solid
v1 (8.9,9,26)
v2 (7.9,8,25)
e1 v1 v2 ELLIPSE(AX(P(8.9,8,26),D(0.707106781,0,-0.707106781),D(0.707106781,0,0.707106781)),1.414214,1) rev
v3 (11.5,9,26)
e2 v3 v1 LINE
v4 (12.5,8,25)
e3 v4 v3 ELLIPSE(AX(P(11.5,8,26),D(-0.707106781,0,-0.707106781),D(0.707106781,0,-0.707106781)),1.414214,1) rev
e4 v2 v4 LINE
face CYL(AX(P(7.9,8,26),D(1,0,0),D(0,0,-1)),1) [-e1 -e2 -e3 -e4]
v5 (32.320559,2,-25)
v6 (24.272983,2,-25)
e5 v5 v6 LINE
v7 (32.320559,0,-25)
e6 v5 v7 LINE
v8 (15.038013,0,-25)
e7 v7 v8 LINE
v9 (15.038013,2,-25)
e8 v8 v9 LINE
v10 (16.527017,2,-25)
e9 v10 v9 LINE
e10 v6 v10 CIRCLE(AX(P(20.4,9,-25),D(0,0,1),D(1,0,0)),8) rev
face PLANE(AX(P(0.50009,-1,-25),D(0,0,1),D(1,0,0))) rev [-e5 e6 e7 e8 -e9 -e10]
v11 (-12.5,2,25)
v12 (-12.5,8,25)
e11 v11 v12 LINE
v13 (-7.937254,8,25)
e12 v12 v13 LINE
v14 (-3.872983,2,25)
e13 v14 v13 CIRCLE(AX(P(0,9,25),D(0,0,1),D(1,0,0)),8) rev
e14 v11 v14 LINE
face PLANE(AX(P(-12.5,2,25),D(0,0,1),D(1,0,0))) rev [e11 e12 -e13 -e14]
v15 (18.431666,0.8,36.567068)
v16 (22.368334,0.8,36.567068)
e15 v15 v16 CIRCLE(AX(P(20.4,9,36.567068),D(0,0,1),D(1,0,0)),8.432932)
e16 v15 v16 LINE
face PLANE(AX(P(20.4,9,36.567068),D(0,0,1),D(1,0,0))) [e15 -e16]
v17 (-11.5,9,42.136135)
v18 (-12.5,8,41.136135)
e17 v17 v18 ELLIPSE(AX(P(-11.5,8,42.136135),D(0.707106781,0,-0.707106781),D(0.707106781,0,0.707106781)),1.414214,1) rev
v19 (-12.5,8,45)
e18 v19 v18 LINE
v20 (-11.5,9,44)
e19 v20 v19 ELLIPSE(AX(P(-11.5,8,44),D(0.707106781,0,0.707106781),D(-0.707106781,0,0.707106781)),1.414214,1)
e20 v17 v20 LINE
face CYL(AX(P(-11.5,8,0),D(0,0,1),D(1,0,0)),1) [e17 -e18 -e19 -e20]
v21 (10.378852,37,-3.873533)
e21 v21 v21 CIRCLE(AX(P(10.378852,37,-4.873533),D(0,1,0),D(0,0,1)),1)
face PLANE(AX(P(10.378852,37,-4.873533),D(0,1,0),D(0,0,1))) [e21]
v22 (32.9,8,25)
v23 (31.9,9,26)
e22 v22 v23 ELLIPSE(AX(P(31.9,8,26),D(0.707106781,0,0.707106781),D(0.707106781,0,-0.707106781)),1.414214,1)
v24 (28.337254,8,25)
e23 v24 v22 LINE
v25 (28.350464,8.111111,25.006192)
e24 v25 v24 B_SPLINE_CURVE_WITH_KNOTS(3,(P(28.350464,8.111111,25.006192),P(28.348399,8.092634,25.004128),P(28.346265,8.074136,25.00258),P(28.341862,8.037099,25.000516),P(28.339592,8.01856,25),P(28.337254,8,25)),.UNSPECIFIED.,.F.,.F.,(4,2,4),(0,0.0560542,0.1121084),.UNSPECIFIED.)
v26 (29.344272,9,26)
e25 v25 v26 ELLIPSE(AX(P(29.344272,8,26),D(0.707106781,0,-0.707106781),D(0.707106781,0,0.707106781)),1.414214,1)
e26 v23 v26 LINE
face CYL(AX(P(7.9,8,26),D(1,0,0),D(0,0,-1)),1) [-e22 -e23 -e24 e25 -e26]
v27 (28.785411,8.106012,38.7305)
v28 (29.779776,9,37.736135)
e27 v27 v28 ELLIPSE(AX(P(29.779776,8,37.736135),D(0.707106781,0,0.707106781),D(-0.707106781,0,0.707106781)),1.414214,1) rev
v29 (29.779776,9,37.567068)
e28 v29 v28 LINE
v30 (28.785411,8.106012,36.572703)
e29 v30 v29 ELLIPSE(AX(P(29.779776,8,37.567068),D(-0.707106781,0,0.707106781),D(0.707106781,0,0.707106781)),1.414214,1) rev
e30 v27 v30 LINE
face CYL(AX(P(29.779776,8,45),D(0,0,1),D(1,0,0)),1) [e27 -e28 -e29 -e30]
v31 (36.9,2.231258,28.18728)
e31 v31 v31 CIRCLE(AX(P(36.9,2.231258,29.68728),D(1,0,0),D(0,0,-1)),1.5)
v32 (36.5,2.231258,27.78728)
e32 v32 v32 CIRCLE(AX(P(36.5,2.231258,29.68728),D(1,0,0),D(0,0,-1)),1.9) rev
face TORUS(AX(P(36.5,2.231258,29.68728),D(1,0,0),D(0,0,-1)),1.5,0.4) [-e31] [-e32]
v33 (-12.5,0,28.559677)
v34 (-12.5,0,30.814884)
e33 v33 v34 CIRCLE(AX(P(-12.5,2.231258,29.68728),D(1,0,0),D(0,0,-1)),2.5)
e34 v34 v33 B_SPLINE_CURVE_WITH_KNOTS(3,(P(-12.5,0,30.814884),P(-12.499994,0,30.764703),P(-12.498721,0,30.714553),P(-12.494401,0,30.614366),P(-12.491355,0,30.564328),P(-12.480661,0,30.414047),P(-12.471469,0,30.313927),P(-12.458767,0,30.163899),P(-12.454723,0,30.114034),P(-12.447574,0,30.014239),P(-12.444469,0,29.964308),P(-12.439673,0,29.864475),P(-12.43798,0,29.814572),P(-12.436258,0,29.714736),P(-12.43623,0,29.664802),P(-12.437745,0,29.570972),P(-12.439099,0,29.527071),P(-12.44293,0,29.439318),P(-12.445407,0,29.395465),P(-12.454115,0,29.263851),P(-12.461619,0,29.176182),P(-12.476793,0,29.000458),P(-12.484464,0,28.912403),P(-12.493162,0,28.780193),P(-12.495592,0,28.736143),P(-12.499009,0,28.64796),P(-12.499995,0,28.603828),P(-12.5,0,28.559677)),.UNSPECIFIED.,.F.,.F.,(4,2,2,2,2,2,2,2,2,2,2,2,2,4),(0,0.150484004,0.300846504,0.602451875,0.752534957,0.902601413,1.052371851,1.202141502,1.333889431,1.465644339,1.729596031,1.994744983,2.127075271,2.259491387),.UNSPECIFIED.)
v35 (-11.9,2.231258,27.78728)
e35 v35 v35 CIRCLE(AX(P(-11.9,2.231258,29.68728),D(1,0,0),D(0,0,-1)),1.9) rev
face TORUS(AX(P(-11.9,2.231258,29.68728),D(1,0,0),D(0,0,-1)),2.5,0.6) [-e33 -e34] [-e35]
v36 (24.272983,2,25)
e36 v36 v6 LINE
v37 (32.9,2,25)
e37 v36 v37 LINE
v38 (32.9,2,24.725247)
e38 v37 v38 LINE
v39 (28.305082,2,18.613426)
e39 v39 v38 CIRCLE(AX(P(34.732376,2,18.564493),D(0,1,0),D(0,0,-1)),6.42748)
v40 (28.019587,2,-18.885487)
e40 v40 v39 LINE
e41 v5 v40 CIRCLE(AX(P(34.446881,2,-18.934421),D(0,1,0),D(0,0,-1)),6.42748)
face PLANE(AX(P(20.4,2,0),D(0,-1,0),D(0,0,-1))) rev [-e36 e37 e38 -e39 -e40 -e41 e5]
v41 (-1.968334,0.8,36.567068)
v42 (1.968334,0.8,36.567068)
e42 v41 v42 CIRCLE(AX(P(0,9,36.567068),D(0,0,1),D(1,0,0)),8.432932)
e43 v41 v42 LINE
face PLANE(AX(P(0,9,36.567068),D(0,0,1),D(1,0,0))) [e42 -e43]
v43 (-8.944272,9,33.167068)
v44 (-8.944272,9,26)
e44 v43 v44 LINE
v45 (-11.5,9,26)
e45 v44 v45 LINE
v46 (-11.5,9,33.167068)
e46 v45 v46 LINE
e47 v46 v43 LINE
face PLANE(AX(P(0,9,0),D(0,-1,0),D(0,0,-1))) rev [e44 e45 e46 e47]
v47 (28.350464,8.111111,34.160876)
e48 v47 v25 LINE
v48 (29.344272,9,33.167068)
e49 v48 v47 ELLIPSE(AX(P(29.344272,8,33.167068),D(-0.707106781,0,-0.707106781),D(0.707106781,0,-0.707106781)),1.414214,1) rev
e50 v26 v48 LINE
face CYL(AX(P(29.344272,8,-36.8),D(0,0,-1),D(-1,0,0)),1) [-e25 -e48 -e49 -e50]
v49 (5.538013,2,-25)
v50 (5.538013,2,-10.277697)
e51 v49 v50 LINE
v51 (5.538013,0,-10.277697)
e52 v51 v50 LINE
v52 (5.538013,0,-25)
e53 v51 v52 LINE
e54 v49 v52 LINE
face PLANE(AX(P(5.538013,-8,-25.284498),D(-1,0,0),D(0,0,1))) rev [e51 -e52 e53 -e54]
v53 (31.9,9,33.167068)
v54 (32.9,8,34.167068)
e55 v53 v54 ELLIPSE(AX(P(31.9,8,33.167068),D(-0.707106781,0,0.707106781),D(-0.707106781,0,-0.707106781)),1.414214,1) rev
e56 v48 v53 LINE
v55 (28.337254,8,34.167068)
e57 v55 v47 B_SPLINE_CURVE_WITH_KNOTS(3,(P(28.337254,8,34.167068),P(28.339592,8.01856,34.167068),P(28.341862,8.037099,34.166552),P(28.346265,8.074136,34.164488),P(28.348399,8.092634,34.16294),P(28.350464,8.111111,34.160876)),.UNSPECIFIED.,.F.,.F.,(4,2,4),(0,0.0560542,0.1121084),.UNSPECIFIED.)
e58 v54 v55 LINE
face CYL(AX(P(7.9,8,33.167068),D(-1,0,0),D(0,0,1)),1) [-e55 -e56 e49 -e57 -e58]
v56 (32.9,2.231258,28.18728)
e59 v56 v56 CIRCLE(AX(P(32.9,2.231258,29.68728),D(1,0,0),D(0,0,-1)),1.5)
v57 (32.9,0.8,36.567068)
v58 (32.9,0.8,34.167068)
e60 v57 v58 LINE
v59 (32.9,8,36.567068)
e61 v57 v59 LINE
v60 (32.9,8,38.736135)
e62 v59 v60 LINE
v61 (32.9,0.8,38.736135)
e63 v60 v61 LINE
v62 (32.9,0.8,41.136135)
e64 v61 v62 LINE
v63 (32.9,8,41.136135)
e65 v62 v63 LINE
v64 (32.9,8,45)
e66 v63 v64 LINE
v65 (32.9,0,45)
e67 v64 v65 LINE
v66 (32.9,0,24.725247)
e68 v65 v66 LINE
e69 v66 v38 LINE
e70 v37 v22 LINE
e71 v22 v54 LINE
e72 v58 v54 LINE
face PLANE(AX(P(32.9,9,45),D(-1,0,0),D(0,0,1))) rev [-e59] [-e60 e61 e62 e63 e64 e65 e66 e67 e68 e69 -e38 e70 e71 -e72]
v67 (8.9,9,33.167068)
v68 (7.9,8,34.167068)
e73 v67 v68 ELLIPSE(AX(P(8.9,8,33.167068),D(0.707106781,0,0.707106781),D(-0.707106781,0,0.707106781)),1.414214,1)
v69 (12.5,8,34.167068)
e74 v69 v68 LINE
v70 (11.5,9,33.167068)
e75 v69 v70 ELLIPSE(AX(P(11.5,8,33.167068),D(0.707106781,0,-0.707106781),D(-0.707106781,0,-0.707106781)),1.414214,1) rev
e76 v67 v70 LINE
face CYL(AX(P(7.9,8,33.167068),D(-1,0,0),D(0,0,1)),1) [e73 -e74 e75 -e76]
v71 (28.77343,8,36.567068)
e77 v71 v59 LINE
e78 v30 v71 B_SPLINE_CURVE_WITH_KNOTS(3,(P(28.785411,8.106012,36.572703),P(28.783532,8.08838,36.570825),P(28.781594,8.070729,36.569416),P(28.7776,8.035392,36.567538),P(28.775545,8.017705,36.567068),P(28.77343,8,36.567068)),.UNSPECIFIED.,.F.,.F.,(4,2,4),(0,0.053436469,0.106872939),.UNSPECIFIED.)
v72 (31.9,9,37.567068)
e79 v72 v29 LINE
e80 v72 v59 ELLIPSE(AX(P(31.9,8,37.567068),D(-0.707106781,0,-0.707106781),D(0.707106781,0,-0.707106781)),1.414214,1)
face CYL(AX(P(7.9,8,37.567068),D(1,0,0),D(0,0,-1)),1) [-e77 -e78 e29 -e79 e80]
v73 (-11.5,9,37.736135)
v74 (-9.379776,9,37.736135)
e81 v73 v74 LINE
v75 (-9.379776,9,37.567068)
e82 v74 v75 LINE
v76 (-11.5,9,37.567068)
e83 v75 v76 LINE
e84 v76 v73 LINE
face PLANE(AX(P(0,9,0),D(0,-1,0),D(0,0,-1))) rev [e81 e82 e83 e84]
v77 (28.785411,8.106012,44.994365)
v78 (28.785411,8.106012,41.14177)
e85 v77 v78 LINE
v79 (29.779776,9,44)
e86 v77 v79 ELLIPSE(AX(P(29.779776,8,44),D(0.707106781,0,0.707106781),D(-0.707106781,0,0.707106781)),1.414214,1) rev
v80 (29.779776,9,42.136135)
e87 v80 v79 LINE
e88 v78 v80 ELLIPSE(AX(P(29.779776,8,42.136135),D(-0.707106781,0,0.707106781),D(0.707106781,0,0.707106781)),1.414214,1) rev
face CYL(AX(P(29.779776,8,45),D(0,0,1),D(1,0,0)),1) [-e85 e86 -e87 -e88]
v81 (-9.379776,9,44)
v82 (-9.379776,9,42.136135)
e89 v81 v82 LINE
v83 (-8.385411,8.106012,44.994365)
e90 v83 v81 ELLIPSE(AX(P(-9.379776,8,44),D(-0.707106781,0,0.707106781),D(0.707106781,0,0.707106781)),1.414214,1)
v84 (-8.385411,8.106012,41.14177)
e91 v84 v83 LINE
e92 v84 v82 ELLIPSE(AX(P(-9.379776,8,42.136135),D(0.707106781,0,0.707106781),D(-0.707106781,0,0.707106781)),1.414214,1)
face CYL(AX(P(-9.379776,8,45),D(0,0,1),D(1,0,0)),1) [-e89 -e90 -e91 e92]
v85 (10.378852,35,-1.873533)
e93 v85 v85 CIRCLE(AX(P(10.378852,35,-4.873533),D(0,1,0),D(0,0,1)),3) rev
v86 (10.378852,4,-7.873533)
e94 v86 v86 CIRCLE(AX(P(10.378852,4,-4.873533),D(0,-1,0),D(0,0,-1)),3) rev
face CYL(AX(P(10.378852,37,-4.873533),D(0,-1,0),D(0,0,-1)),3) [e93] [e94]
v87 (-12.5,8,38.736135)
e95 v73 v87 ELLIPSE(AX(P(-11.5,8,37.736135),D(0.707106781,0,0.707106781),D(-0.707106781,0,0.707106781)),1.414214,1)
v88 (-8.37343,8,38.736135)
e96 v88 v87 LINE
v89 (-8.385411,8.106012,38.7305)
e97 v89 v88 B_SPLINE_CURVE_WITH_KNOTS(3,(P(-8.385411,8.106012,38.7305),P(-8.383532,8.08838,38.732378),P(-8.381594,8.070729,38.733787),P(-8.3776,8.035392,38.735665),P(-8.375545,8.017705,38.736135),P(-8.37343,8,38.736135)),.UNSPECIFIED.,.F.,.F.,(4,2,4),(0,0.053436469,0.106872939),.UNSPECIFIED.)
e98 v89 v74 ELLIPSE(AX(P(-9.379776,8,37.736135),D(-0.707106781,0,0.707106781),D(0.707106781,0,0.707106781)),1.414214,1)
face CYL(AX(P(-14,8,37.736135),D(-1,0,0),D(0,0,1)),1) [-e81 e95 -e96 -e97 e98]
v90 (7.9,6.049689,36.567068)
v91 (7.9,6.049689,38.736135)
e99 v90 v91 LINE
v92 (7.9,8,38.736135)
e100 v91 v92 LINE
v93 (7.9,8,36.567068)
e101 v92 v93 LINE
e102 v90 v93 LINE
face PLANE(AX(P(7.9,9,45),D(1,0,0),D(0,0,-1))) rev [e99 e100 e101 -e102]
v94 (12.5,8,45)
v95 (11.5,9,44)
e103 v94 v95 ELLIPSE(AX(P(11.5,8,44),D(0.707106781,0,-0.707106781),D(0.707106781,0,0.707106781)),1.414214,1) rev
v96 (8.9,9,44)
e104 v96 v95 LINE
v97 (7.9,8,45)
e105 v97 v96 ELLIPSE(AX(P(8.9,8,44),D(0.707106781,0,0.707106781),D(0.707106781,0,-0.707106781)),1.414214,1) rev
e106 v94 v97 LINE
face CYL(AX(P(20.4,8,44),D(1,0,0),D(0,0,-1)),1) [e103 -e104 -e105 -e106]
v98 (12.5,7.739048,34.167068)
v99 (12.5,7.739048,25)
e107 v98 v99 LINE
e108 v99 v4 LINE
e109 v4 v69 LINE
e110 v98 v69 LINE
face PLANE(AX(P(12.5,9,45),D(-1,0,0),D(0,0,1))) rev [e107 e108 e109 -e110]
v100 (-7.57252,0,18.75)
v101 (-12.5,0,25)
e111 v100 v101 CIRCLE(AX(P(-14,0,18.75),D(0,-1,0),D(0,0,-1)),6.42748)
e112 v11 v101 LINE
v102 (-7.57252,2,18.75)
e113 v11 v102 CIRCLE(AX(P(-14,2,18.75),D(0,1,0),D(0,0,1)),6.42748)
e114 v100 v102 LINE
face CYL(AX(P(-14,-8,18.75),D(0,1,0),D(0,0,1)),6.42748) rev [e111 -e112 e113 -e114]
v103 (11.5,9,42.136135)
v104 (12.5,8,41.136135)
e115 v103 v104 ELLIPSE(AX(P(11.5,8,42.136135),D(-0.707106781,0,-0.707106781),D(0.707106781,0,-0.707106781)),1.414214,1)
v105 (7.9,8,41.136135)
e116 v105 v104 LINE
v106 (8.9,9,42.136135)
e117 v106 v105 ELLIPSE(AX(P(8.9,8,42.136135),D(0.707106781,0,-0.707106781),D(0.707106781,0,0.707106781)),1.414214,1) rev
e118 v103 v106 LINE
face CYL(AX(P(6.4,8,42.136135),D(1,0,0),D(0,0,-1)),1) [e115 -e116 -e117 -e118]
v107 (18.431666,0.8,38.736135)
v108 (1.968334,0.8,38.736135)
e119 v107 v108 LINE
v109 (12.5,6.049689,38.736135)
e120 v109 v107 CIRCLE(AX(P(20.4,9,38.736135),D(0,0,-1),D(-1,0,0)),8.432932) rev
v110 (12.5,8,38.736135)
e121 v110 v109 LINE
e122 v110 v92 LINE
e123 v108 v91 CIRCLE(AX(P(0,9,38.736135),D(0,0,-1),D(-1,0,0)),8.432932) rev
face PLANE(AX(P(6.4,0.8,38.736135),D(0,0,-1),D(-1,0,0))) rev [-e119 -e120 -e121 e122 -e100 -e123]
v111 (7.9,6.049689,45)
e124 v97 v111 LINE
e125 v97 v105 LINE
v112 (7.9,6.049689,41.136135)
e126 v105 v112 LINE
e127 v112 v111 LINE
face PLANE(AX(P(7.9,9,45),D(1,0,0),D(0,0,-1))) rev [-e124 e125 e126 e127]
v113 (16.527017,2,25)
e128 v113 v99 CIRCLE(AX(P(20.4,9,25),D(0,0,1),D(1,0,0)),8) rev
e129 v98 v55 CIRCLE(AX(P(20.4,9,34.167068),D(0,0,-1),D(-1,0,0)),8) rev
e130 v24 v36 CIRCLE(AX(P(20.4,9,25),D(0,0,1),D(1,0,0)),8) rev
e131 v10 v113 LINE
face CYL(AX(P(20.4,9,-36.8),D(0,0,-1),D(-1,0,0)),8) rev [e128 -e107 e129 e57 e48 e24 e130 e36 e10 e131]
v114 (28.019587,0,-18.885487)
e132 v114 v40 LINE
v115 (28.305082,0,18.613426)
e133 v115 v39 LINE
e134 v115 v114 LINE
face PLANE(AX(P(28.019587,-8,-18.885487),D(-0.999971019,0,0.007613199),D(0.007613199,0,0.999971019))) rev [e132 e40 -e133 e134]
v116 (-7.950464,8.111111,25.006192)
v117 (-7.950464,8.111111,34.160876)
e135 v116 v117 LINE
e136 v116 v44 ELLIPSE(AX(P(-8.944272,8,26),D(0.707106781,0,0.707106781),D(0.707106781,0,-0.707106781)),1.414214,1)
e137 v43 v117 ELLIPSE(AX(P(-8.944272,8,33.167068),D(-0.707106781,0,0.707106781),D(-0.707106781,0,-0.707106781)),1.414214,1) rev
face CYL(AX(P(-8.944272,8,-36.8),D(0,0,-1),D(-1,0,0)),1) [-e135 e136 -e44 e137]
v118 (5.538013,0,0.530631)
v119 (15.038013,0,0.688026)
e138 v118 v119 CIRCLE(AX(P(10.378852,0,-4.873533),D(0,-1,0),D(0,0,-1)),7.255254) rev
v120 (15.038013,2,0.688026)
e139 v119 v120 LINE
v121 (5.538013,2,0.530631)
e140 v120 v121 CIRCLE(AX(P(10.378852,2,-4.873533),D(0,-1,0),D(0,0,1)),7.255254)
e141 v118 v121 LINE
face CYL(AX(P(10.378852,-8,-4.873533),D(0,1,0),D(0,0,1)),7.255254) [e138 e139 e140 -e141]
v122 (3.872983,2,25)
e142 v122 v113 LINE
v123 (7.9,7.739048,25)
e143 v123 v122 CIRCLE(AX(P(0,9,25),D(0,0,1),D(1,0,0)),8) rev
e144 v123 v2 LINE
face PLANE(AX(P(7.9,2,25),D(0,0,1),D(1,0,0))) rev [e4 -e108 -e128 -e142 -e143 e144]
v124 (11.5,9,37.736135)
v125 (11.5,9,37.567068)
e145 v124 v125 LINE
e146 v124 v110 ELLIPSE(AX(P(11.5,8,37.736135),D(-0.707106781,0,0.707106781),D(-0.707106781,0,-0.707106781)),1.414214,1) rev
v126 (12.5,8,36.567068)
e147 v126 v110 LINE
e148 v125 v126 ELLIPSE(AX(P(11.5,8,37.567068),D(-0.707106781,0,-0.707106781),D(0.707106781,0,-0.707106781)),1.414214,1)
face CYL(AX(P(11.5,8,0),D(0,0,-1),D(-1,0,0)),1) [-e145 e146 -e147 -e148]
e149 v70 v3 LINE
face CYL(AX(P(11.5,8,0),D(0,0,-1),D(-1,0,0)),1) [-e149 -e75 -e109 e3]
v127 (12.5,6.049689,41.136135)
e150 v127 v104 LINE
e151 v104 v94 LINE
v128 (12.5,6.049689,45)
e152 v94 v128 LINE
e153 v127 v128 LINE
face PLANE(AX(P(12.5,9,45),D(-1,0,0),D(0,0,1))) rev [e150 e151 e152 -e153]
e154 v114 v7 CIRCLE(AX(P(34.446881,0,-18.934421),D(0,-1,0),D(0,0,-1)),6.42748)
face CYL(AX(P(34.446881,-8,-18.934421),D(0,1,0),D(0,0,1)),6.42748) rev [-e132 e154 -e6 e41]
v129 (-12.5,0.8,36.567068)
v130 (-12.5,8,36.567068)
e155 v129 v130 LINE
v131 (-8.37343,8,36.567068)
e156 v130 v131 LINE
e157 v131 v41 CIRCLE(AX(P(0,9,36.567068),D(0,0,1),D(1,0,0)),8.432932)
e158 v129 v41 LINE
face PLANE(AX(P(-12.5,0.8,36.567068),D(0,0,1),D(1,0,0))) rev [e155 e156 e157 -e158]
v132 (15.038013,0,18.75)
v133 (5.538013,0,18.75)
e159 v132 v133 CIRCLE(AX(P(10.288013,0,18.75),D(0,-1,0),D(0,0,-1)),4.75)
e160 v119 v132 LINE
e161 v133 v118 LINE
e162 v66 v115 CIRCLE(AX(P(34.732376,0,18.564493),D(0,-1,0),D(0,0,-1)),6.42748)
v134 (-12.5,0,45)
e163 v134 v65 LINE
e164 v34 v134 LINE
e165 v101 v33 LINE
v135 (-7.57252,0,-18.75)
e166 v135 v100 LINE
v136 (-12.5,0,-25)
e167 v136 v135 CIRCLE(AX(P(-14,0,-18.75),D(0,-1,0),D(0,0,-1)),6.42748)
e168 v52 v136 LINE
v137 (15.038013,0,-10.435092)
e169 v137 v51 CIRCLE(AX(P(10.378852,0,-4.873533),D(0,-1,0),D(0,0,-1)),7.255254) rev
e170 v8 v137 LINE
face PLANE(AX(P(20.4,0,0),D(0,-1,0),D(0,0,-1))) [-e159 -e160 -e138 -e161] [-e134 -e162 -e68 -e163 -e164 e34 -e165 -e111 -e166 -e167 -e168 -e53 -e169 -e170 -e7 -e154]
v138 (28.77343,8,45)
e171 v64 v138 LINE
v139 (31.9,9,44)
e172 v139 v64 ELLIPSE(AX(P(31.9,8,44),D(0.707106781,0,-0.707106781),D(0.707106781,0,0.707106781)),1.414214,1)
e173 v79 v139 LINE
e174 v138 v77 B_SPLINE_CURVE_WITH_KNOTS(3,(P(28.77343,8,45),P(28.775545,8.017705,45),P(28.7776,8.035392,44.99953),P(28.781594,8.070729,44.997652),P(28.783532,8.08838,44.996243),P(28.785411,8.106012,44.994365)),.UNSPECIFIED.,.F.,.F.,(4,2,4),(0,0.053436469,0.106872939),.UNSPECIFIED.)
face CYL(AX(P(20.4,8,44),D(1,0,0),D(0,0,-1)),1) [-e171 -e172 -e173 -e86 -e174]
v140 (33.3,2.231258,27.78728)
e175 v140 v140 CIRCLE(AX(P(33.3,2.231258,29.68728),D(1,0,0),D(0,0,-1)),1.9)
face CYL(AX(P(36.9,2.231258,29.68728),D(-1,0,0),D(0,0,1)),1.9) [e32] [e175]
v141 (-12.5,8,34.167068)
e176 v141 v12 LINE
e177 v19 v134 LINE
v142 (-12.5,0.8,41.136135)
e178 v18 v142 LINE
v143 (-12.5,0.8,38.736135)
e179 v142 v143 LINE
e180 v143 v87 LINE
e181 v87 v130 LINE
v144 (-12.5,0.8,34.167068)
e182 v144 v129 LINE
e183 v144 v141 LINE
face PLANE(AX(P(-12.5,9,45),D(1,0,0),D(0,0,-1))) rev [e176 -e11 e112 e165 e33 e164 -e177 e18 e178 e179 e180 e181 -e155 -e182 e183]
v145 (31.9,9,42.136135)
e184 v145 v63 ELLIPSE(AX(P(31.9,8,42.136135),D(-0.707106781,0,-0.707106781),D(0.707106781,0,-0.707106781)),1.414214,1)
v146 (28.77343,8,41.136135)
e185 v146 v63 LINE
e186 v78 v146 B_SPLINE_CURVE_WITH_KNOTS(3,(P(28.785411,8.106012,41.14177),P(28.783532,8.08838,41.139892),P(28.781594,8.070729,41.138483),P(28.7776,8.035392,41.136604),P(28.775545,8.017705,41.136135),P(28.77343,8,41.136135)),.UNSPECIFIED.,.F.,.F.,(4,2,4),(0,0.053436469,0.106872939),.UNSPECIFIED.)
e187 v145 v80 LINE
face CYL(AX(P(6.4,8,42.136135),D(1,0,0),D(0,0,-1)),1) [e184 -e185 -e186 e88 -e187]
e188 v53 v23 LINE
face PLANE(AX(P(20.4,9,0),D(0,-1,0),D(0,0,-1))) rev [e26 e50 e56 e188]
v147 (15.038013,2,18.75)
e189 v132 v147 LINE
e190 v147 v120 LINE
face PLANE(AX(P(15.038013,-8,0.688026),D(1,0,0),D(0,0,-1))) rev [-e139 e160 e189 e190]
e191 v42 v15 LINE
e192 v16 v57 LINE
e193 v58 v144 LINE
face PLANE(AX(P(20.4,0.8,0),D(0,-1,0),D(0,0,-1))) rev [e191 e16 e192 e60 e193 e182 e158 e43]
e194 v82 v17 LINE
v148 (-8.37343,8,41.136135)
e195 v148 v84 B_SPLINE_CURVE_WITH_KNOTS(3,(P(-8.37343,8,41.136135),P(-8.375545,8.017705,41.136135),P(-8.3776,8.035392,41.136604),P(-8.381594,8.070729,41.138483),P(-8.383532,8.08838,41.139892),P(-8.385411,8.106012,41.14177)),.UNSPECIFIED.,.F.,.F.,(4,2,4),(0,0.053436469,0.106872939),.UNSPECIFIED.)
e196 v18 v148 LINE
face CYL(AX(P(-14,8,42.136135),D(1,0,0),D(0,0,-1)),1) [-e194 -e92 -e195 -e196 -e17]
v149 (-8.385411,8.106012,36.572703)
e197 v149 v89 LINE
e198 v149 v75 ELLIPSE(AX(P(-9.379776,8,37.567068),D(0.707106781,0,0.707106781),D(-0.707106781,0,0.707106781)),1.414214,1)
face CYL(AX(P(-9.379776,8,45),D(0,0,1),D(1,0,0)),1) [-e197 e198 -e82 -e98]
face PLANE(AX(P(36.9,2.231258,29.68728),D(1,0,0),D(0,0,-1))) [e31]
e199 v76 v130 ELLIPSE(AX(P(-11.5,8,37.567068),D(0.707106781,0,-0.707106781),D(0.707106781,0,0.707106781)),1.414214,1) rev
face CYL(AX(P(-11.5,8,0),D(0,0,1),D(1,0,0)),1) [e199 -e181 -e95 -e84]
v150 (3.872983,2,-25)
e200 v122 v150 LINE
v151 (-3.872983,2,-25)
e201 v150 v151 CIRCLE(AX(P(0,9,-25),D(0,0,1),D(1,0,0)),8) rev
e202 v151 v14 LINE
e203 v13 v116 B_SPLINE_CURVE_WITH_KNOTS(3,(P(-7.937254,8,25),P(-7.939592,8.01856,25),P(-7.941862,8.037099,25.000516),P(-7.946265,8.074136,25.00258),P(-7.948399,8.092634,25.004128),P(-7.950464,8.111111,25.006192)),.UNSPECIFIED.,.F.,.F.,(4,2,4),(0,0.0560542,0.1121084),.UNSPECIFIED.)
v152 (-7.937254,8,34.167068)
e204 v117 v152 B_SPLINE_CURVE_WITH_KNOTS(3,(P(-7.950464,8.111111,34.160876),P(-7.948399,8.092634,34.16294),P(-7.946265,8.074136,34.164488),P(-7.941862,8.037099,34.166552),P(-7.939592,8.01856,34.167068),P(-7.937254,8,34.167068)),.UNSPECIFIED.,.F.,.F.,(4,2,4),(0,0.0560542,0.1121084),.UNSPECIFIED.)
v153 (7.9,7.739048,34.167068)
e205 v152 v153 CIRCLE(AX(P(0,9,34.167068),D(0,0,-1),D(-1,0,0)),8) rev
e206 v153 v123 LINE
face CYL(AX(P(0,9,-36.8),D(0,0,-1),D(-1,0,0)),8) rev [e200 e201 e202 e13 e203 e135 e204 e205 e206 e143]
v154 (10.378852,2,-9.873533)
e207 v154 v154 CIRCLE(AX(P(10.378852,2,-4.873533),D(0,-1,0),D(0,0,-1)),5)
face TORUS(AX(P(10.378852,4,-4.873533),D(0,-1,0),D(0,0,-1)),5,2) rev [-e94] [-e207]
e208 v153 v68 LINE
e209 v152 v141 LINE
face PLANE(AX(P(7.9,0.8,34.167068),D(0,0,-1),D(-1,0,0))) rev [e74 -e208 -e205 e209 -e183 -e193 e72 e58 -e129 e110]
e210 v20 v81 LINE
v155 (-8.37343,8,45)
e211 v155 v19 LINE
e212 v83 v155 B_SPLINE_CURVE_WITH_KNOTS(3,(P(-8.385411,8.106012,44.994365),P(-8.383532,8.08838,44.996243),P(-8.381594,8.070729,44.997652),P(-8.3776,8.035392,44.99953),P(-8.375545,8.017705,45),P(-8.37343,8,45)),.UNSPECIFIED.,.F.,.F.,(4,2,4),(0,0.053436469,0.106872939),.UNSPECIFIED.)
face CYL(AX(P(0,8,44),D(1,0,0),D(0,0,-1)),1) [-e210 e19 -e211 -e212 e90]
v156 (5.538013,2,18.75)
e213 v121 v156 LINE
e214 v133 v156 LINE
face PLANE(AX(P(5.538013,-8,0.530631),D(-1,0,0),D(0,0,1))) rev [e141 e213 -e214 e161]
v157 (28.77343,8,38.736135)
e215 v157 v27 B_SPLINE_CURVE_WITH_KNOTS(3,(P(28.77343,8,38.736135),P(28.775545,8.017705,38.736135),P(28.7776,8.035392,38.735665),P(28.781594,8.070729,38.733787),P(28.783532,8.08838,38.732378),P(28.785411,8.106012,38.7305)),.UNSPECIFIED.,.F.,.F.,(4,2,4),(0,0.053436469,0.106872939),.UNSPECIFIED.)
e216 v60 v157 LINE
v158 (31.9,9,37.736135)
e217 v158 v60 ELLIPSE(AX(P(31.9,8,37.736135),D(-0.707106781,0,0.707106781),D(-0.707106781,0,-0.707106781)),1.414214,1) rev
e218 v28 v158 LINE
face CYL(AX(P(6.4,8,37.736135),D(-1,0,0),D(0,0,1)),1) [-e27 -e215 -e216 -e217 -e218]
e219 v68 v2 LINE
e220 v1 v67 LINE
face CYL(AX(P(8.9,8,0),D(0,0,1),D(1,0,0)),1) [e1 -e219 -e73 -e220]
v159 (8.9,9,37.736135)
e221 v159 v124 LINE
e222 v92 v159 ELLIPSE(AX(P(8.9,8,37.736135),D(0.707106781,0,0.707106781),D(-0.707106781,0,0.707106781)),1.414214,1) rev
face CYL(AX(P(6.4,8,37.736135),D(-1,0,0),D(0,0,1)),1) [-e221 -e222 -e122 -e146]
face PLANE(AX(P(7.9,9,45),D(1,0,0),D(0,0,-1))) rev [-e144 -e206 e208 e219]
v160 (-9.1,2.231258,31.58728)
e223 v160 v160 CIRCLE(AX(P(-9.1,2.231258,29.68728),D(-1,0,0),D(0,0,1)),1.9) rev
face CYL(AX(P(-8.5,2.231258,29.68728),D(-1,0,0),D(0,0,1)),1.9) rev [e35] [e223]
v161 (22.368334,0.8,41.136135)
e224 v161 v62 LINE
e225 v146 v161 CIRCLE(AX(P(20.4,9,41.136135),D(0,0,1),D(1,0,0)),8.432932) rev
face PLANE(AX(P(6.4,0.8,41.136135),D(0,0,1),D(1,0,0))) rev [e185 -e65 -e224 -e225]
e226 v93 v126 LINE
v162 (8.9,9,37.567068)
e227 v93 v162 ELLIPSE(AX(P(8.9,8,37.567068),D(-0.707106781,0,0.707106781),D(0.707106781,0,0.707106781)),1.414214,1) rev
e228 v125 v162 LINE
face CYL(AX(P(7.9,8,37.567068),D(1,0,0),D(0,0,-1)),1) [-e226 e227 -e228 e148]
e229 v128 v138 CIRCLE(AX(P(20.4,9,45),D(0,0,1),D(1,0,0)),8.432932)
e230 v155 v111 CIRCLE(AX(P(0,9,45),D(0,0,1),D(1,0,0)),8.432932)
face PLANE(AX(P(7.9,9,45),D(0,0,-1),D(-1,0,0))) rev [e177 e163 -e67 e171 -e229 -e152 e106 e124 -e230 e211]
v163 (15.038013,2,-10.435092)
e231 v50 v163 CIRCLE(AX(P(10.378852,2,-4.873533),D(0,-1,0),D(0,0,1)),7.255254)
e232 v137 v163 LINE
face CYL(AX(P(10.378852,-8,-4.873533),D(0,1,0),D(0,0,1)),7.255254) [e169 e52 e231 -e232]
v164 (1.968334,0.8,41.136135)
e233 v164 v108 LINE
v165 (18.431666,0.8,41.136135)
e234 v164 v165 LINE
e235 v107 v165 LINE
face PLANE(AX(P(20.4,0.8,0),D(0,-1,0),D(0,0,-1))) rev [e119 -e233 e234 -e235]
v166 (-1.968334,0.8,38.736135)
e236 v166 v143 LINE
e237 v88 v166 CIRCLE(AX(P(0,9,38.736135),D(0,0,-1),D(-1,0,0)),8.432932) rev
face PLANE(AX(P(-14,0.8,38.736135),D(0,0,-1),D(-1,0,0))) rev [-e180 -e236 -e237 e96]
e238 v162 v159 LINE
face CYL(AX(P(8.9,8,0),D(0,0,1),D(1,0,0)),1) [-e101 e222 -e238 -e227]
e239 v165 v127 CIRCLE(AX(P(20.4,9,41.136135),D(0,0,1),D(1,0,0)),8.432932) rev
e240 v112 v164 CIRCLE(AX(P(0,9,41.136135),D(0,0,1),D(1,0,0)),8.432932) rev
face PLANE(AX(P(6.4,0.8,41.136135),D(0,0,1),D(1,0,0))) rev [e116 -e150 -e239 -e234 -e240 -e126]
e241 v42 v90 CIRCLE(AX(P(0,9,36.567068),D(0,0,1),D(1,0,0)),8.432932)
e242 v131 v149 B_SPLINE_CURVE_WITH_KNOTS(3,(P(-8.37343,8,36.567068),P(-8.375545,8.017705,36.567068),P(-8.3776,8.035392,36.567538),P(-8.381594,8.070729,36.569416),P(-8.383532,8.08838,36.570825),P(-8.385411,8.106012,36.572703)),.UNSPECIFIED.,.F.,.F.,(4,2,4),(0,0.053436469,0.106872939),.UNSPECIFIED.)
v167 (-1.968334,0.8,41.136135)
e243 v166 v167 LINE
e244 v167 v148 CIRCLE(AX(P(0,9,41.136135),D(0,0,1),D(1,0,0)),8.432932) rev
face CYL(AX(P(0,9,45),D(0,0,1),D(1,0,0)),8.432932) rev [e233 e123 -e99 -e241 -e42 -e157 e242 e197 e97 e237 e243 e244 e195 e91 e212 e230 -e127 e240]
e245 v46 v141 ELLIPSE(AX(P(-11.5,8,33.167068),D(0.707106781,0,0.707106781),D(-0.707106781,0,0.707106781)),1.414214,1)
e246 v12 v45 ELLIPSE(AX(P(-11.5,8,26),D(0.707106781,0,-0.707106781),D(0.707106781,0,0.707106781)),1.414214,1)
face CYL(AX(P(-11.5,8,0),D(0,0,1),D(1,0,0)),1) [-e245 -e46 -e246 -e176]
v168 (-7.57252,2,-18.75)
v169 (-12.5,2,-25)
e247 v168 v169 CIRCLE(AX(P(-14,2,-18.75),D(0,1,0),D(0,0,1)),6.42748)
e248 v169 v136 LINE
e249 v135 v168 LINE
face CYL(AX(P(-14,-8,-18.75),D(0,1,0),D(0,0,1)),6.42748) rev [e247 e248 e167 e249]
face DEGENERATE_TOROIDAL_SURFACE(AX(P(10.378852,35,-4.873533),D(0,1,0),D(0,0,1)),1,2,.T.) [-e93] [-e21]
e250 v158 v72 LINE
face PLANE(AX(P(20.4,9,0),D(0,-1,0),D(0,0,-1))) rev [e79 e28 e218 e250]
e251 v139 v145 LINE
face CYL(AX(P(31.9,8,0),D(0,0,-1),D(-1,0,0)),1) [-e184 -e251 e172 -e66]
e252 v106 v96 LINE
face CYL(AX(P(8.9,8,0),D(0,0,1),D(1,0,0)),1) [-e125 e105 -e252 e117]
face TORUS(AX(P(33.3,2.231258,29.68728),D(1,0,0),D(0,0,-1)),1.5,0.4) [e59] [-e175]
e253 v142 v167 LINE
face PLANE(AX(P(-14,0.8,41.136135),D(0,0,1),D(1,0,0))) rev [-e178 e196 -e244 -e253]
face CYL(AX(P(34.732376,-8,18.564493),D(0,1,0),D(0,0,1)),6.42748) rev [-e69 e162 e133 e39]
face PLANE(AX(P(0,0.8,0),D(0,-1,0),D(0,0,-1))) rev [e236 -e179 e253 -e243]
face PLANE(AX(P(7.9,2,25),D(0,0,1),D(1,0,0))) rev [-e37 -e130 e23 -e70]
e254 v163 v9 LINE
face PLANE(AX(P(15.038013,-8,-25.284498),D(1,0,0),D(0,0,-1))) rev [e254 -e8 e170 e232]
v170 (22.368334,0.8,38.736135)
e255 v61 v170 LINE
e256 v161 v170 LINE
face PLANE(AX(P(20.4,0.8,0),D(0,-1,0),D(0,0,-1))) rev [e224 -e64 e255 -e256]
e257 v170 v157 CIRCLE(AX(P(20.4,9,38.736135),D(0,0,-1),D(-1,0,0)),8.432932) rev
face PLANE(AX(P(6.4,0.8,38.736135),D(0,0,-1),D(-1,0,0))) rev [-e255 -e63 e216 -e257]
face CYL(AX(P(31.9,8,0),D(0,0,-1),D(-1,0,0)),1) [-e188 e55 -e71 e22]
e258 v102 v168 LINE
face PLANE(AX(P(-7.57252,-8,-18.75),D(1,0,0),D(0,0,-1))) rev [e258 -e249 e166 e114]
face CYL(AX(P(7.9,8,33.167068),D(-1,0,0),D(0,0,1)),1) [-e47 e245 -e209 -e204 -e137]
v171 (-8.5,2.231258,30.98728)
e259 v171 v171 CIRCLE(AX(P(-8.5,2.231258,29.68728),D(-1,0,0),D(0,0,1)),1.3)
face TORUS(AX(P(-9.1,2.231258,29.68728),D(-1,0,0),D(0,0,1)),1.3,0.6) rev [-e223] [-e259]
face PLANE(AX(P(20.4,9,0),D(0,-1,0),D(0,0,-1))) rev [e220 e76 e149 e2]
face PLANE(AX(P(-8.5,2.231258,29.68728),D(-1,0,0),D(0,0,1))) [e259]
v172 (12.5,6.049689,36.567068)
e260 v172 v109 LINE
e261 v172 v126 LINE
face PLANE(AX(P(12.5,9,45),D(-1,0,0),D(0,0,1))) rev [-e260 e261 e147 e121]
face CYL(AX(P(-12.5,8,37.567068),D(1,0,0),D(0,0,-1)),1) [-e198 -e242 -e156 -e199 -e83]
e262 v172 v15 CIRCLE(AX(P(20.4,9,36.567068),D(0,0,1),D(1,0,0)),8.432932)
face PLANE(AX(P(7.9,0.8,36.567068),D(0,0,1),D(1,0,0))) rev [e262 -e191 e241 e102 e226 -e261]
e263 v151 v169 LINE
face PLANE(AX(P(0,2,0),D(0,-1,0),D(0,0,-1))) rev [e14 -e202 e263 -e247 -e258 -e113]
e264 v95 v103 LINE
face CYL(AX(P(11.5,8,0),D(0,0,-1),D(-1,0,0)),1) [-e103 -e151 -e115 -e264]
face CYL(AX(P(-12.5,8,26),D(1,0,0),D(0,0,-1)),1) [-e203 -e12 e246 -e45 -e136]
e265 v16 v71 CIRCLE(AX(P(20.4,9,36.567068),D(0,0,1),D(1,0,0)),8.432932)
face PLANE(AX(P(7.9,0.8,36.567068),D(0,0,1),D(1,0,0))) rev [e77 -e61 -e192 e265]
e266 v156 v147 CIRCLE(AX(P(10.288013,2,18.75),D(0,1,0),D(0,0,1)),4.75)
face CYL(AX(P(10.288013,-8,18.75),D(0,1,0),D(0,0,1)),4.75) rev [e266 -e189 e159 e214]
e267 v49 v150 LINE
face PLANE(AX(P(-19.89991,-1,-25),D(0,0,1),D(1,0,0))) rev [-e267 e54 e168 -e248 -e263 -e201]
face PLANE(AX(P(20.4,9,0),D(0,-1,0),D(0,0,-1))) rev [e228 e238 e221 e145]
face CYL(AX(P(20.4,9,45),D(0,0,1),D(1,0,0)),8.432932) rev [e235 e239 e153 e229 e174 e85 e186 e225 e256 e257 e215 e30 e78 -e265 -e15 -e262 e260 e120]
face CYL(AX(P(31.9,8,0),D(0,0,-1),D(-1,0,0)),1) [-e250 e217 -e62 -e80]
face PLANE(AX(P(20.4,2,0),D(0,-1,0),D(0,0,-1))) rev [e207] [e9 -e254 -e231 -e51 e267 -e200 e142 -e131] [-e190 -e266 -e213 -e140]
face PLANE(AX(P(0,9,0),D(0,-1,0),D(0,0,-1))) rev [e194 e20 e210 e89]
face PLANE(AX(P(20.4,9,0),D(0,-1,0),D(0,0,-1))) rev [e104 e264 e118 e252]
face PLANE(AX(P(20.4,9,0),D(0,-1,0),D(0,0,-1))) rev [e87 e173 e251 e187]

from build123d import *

# Parameters (mm, degrees)
SKETCH1_W           = 25
SKETCH1_H           = 90
BOSS_EXTRUDE1_DEPTH = 9
SKETCH4_W           = 8
SKETCH4_H           = 71
SKETCH5_W           = 25
SKETCH5_H           = 2.4
SKETCH5_W_2         = 28
FLANGE_SLOT_DEPTH   = 8.2
SKETCH6_W           = 8.432931683
SKETCH6_H           = 8.432931683
SKETCH18_W          = 25
SKETCH18_H          = 50
SYRINGE_BAY_DEPTH   = 7
SKETCH26_W          = 38.352553791
SKETCH26_H          = 20.215566654
CUT_EXTRUDE14_DEPTH = 10
LPATTERN3_COUNT     = 2
LPATTERN3_PITCH     = 20.4
SKETCH31_R          = 1.9
CUT_EXTRUDE16_DEPTH = 4
SKETCH33_R          = 1.9
BOSS_EXTRUDE2_DEPTH = 4
FILLET1_R           = 0.4
FILLET2_R           = 0.6
CUT_EXTRUDE17_DEPTH = 10
SKETCH36_R          = 3
BOSS_EXTRUDE3_DEPTH = 35
FILLET5_R           = 2
FILLET7_R           = 1


with BuildPart() as part:
    # Sketch1 → Boss-Extrude1 (new body)
    with BuildSketch(Plane(origin=(0, 0, 0), x_dir=(1, 0, 0), z_dir=(0, 1, 0))):
        Rectangle(SKETCH1_W, SKETCH1_H)
    extrude(amount=BOSS_EXTRUDE1_DEPTH)

    # Sketch4 → Syringe Body slot (revolve, cut)
    with BuildSketch(Plane(origin=(0, 9, 0), x_dir=(1, 0, 0), z_dir=(0, 1, 0))):
        with Locations((-4, 1.3)):
            Rectangle(SKETCH4_W, SKETCH4_H)
    revolve(axis=Axis((0, 9, -36.8), (0, 0, 1)), mode=Mode.SUBTRACT)

    # Sketch5 → Flange Slot (cut)
    with BuildSketch(Plane(origin=(0, 9, 0), x_dir=(1, 0, 0), z_dir=(0, 1, 0))):
        with Locations((0, -35.367068317)):
            Rectangle(SKETCH5_W, SKETCH5_H)
        with Locations((0, -39.936134865)):
            Rectangle(SKETCH5_W_2, SKETCH5_H)
    extrude(amount=-FLANGE_SLOT_DEPTH, mode=Mode.SUBTRACT)

    # Sketch6 → Plunger Slot (revolve, cut)
    with BuildSketch(Plane(origin=(0, 9, 0), x_dir=(1, 0, 0), z_dir=(0, 1, 0))):
        with Locations((-4.216465842, -40.783534159)):
            Rectangle(SKETCH6_W, SKETCH6_H)
    revolve(axis=Axis((0, 9, 45), (0, 0, -1)), mode=Mode.SUBTRACT)

    # Sketch18 → Syringe Bay (cut)
    with BuildSketch(Plane(origin=(0, 9, 0), x_dir=(1, 0, 0), z_dir=(0, 1, 0))):
        Rectangle(SKETCH18_W, SKETCH18_H)
    extrude(amount=-SYRINGE_BAY_DEPTH, mode=Mode.SUBTRACT)

    # Sketch26 → Cut-Extrude14 (cut)
    with BuildSketch(Plane(origin=(0, 9, 0), x_dir=(1, 0, 0), z_dir=(0, 1, 0))):
        with Locations((-0.72363309, 35.107783327)):
            Rectangle(SKETCH26_W, SKETCH26_H)
    extrude(amount=-CUT_EXTRUDE14_DEPTH, mode=Mode.SUBTRACT)


with BuildPart() as lpattern3_1:
    # LPattern3: pattern copy
    add(part.part.moved(Location(Vector(1, 0, 0) * (1 * LPATTERN3_PITCH))))


with BuildPart() as part_1:
    add(part.part)

    # Sketch31 → Cut-Extrude16 (cut)
    with BuildSketch(Plane.ZY.offset(12.5)):
        with Locations((29.687280392, 2.231257616)):
            Circle(SKETCH31_R)
    extrude(amount=-CUT_EXTRUDE16_DEPTH, mode=Mode.SUBTRACT)

    # Fillet2
    # the kernel refuses this fillet: 0.6 mm, written as the material it adds along each edge
    with BuildSketch(Plane(origin=(-8.5, 2.231257616, 29.687280392), x_dir=(0, 0, 1), z_dir=(0, -1, 0))) as fillet2_piece_1:
        with BuildLine():
            CenterArc((1.9 - FILLET2_R, FILLET2_R), FILLET2_R, 270, 90)
            Line((1.9 - FILLET2_R, 0), (1.9, 0))
            Line((1.9, 0), (1.9, FILLET2_R))
        make_face()
    revolve(axis=Axis((-8.5, 2.231257616, 29.687280392), (-1, 0, 0)))
    # the kernel refuses this fillet: 0.6 mm, written as the material it takes off along each edge
    with BuildSketch(Plane(origin=(-12.5, 2.231257616, 29.687280392), x_dir=(0, 0, 1), z_dir=(0, -1, 0))) as fillet2_2_piece_1:
        with BuildLine():
            CenterArc((1.9 + FILLET2_R, -FILLET2_R), FILLET2_R, 90, 90)
            Line((1.9, -FILLET2_R), (1.9, 0))
            Line((1.9, 0), (1.9 + FILLET2_R, 0))
        make_face()
    revolve(axis=Axis((-12.5, 2.231257616, 29.687280392), (-1, 0, 0)), mode=Mode.SUBTRACT)


with BuildPart() as body_3:
    # Sketch33 → Boss-Extrude2 (new body)
    with BuildSketch(Plane(origin=(32.9, 0, 0), x_dir=(0, 0, -1), z_dir=(1, 0, 0))):
        with Locations((-29.687280392, 2.231257616)):
            Circle(SKETCH33_R)
    extrude(amount=BOSS_EXTRUDE2_DEPTH)

    # Fillet1
    fillet1_edges = [body_3.edges().sort_by_distance(p)[0] for p in [
        (32.9, 2.231257616, 31.587280392),
        (36.9, 2.231257616, 31.587280392),
    ]]
    fillet(fillet1_edges, radius=FILLET1_R)


with BuildPart() as cut_extrude17_tool:
    # Sketch35 → Cut-Extrude17 (new body)
    with BuildSketch(Plane(origin=(0, 2, 0), x_dir=(1, 0, 0), z_dir=(0, 1, 0))):
        with BuildLine():
            Line((-7.572519934, 18.75), (-7.572519934, -18.75))
            ThreePointArc((-7.572519934, -18.75), (-14, -25.177480066), (-20.427480066, -18.75))
            Line((-20.427480066, -18.75), (-20.427480066, 18.75))
            ThreePointArc((-20.427480066, 18.75), (-14, 25.177480066), (-7.572519934, 18.75))
        make_face()
        with BuildLine():
            Line((15.038012539, 25.284497927), (15.038012539, 10.435091669))
            ThreePointArc((15.038012539, 10.435091669), (10.258664257, 12.127791533), (5.538012539, 10.277696889))
            Line((5.538012539, 10.277696889), (5.538012539, 25.284497927))
            ThreePointArc((5.538012539, 25.284497927), (10.288012539, 30.034497927), (15.038012539, 25.284497927))
        make_face()
        with BuildLine():
            Line((28.019587368, 18.885486869), (28.305082347, -18.61342635))
            ThreePointArc((28.305082347, -18.61342635), (34.781309827, -24.991786455), (41.159669932, -18.515558975))
            Line((41.159669932, -18.515558975), (40.874174953, 18.983354244))
            ThreePointArc((40.874174953, 18.983354244), (34.397947473, 25.361714349), (28.019587368, 18.885486869))
        make_face()
        with BuildLine():
            Line((15.038012539, -0.688026199), (15.038012539, -18.75))
            ThreePointArc((15.038012539, -18.75), (10.288012539, -23.5), (5.538012539, -18.75))
            Line((5.538012539, -18.75), (5.538012539, -0.530631419))
            ThreePointArc((5.538012539, -0.530631419), (10.258664257, -2.380726063), (15.038012539, -0.688026199))
        make_face()
    extrude(amount=-CUT_EXTRUDE17_DEPTH)


with BuildPart() as part_2:
    add(part_1.part)

    # Cut-Extrude17: cut by cut_extrude17_tool
    add(cut_extrude17_tool.part, mode=Mode.SUBTRACT)


with BuildPart() as lpattern3_1_1:
    add(lpattern3_1.part)

    # Cut-Extrude17: cut by cut_extrude17_tool
    add(cut_extrude17_tool.part, mode=Mode.SUBTRACT)

    # Combine2: union part, body 3
    add(part_2.part)
    add(body_3.part)

    # Sketch36 → Boss-Extrude3 (add)
    with BuildSketch(Plane(origin=(0, 2, 0), x_dir=(1, 0, 0), z_dir=(0, 1, 0))):
        with Locations(Location((10.378851885, 4.873532735, 0), (0, 0, 90))):
            Circle(SKETCH36_R)
    extrude(amount=BOSS_EXTRUDE3_DEPTH)

    # Fillet5
    fillet5_edges = [lpattern3_1_1.edges().sort_by_distance(p)[0] for p in [
        (10.378851885, 2, -1.873532735),
        (10.378851885, 37, -1.873532735),
    ]]
    fillet(fillet5_edges, radius=FILLET5_R)

    # Fillet7
    fillet7_edges = [lpattern3_1_1.edges().sort_by_distance(p)[0] for p in [
        (7.9, 9, 29.583534158),
        (10.2, 9, 25),
        (30.65, 9, 25),
        (10.2, 9, 45),
        (32.9, 9, 37.651601591),
        (32.9, 9, 29.583534158),
        (7.9, 9, 37.651601591),
        (7.9, 9, 43.068067433),
        (10.2, 9, 41.136134865),
        (30.866465842, 9, 38.736134865),
        (-10.25, 9, 34.167068317),
        (12.5, 9, 37.651601591),
        (12.5, 9, 43.068067433),
        (-8.432931683, 9, 37.651601591),
        (-8.432931683, 9, 43.068067433),
        (-12.5, 9, 29.583534158),
        (-8, 9, 29.583534158),
        (12.5, 9, 29.583534158),
        (-12.5, 9, 37.651601591),
        (-12.5, 9, 43.068067433),
        (-10.466465842, 9, 45),
        (-10.466465842, 9, 38.736134865),
        (-10.466465842, 9, 36.567068317),
        (-10.466465842, 9, 41.136134865),
        (-10.25, 9, 25),
        (10.2, 9, 34.167068317),
        (10.2, 9, 36.567068317),
        (30.65, 9, 34.167068317),
        (32.9, 9, 43.068067433),
        (10.2, 9, 38.736134865),
        (30.866465842, 9, 41.136134865),
        (30.866465842, 9, 36.567068317),
        (30.866465842, 9, 45),
        (28.832931683, 9, 37.651601591),
        (28.832931683, 9, 43.068067433),
        (28.4, 9, 29.583534158),
    ]]
    fillet(fillet7_edges, radius=FILLET7_R)


solid = lpattern3_1_1.part
